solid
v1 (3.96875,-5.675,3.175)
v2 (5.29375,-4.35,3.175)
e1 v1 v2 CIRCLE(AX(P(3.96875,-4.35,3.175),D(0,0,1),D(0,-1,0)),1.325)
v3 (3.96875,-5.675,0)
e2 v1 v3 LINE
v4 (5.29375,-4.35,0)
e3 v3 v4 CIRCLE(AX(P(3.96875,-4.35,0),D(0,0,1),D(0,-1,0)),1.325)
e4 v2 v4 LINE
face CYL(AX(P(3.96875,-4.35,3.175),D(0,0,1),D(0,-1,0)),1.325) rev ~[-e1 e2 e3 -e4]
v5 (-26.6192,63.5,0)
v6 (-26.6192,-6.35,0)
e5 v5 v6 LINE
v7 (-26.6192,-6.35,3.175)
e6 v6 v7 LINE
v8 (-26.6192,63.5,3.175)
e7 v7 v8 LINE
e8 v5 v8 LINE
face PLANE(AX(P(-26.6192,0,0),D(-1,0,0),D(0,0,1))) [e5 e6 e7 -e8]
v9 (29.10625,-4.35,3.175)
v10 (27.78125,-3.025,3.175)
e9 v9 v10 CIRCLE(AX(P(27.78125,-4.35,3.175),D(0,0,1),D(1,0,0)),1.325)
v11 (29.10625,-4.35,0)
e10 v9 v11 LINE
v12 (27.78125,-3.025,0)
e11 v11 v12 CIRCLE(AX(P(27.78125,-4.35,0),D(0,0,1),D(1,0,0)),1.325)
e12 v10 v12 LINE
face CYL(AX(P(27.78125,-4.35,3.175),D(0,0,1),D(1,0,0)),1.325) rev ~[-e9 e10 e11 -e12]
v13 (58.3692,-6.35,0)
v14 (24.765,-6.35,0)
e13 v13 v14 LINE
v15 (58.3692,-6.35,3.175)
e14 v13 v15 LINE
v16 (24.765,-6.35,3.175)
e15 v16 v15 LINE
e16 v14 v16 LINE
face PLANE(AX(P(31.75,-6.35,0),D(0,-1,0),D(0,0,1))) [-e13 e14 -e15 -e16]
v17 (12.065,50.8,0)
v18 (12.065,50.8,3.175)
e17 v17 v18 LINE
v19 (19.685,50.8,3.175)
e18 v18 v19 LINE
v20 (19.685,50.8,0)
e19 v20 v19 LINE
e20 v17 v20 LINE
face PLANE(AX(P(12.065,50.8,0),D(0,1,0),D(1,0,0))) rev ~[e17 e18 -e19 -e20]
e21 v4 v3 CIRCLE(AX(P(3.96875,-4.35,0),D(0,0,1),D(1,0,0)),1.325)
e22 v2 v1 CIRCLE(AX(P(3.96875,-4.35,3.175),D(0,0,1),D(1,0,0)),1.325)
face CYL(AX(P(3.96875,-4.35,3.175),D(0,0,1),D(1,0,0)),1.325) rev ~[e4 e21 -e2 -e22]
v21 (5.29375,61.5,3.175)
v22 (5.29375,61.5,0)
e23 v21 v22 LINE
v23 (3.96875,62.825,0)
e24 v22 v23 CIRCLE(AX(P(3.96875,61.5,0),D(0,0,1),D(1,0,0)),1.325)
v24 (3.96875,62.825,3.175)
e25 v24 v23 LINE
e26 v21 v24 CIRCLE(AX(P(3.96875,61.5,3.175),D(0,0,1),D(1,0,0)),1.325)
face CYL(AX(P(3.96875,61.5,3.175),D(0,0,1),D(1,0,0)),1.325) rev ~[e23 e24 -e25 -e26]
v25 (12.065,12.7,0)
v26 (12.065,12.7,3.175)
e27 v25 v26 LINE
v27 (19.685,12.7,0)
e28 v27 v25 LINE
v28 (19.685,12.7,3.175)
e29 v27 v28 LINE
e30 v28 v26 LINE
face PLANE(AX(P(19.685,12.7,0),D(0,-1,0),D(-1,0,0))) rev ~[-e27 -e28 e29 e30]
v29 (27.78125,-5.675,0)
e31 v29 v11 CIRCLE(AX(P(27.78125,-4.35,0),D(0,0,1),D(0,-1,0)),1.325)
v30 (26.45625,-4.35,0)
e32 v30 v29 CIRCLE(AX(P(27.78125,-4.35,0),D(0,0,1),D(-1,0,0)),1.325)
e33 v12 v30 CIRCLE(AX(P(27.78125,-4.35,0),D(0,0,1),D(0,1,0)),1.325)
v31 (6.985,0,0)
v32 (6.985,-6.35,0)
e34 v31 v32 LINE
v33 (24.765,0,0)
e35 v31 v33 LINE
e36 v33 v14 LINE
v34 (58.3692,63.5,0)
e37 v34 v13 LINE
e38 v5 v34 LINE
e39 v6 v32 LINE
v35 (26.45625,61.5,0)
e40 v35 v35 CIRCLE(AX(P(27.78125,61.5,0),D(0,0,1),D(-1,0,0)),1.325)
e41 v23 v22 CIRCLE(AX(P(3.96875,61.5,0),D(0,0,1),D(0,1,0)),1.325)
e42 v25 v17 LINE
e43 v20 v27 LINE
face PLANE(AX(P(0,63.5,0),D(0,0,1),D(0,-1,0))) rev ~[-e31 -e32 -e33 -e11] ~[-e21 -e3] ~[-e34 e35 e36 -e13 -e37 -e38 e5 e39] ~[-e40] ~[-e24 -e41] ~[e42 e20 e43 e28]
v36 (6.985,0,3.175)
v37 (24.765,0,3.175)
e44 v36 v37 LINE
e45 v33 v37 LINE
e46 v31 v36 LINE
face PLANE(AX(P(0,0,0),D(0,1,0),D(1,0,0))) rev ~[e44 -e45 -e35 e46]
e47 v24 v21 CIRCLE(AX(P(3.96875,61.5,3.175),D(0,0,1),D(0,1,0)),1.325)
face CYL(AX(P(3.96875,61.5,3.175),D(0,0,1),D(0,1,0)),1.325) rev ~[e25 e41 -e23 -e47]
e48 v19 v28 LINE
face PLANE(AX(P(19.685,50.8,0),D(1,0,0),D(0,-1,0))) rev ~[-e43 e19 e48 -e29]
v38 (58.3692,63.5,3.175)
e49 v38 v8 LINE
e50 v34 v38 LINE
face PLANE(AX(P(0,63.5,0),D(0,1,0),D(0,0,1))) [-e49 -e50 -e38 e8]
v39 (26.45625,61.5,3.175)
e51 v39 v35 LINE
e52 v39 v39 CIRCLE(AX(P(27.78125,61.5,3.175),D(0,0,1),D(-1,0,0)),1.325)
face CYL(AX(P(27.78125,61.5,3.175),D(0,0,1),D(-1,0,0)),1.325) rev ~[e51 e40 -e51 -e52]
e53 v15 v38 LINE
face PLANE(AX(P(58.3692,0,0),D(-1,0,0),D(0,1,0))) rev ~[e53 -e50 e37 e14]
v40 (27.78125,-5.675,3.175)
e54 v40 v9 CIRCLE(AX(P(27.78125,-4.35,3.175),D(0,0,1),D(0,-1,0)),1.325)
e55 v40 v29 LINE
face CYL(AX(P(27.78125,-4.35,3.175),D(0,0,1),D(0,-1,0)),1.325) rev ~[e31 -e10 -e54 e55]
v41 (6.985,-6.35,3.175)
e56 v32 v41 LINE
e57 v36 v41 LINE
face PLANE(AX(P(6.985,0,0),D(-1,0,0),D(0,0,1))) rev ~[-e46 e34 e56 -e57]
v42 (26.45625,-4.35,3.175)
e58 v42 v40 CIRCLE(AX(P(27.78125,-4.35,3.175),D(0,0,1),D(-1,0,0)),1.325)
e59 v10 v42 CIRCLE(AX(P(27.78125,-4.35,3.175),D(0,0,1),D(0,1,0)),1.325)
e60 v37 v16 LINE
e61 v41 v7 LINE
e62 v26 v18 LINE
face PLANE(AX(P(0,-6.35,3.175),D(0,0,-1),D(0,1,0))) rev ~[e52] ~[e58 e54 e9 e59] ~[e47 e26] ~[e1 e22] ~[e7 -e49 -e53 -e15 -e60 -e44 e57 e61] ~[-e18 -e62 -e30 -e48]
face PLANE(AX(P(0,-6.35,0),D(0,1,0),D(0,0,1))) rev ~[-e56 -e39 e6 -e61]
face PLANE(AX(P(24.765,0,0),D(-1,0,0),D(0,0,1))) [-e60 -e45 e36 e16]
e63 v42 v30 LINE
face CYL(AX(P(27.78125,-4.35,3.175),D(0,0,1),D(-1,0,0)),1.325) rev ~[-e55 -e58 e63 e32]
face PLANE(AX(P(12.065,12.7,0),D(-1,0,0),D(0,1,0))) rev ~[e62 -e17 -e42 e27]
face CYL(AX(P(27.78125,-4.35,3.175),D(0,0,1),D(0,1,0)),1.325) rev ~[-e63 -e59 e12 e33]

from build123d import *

# Parameters (mm, degrees)
F1_DEPTH = 3.175
F2_W     = 6.985
F2_H     = 3.175
F3_DEPTH = 6.35
F5_DEPTH = 25.4
F6_DEPTH = 25.4
F7_DEPTH = 26.6192
F8_DEPTH = 26.6192


# Not quite as in the source:
# - a feature names something its author has since deleted; it is built from what else it names


with BuildPart() as f1:
    # F0 (on Top) → F1 (new body)
    with BuildSketch(Plane.XY):
        Polygon((0, 63.5), (0, 0), (15.875, 0), (15.875, 12.7), (12.065, 12.7), (12.065, 50.8), (15.875, 50.8), (15.875, 63.5), align=None)
        Polygon((15.875, 12.7), (15.875, 0), (31.75, 0), (31.75, 63.5), (15.875, 63.5), (15.875, 50.8), (19.685, 50.8), (19.685, 12.7), align=None)
    extrude(amount=F1_DEPTH)

    # F2 (on face) → F3 (join)
    with BuildSketch(Plane.XZ):
        with Locations((3.4925, 1.5875)):
            Rectangle(F2_W, F2_H)
        with Locations((28.2575, 1.5875)):
            Rectangle(F2_W, F2_H)
    extrude(amount=F3_DEPTH)

    # F4 (on face) → F5 (cut)
    with BuildSketch(Plane.XY.offset(3.175)):
        with BuildLine():
            ThreePointArc((5.29375, -4.35), (3.0318335149, -3.4130835149), (3.96875, -5.675))
            Line((3.96875, -5.675), (3.96875, -4.35))
            Line((3.96875, -4.35), (5.29375, -4.35))
        make_face()
        with BuildLine():
            Line((3.96875, -4.35), (3.96875, -5.675))
            ThreePointArc((3.96875, -5.675), (4.9056664851, -5.2869164851), (5.29375, -4.35))
            Line((5.29375, -4.35), (3.96875, -4.35))
        make_face()
        with BuildLine():
            ThreePointArc((27.78125, -3.025), (26.8443335149, -3.4130835149), (26.45625, -4.35))
            Line((26.45625, -4.35), (27.78125, -4.35))
            Line((27.78125, -4.35), (27.78125, -3.025))
        make_face()
    extrude(amount=-F5_DEPTH, mode=Mode.SUBTRACT)

    # F4 (on face) → F6 (cut)
    with BuildSketch(Plane.XY.offset(3.175)):
        with BuildLine():
            ThreePointArc((29.10625, 61.5), (27.78125, 62.825), (26.45625, 61.5))
            ThreePointArc((26.45625, 61.5), (27.78125, 60.175), (29.10625, 61.5))
        make_face()
        with BuildLine():
            ThreePointArc((5.29375, 61.5), (4.9056664851, 62.4369164851), (3.96875, 62.825))
            ThreePointArc((3.96875, 62.825), (3.0318335149, 60.5630835149), (5.29375, 61.5))
        make_face()
        with BuildLine():
            Line((27.78125, -4.35), (26.45625, -4.35))
            ThreePointArc((26.45625, -4.35), (26.8443335149, -5.2869164851), (27.78125, -5.675))
            ThreePointArc((27.78125, -5.675), (28.7181664851, -5.2869164851), (29.10625, -4.35))
            ThreePointArc((29.10625, -4.35), (28.7181664851, -3.4130835149), (27.78125, -3.025))
            Line((27.78125, -3.025), (27.78125, -4.35))
        make_face()
    extrude(amount=-F6_DEPTH, mode=Mode.SUBTRACT)

    # F7 (add): a face of the model
    f7_faces = [f1.faces().sort_by_distance(p)[0] for p in [
        (31.75, 28.575, 1.5875),
    ]]
    extrude(f7_faces, amount=F7_DEPTH)

    # F8 (add): a face of the model
    f8_faces = [f1.faces().sort_by_distance(p)[0] for p in [
        (0, 28.575, 1.5875),
    ]]
    extrude(f8_faces, amount=F8_DEPTH)


solid = f1.part
